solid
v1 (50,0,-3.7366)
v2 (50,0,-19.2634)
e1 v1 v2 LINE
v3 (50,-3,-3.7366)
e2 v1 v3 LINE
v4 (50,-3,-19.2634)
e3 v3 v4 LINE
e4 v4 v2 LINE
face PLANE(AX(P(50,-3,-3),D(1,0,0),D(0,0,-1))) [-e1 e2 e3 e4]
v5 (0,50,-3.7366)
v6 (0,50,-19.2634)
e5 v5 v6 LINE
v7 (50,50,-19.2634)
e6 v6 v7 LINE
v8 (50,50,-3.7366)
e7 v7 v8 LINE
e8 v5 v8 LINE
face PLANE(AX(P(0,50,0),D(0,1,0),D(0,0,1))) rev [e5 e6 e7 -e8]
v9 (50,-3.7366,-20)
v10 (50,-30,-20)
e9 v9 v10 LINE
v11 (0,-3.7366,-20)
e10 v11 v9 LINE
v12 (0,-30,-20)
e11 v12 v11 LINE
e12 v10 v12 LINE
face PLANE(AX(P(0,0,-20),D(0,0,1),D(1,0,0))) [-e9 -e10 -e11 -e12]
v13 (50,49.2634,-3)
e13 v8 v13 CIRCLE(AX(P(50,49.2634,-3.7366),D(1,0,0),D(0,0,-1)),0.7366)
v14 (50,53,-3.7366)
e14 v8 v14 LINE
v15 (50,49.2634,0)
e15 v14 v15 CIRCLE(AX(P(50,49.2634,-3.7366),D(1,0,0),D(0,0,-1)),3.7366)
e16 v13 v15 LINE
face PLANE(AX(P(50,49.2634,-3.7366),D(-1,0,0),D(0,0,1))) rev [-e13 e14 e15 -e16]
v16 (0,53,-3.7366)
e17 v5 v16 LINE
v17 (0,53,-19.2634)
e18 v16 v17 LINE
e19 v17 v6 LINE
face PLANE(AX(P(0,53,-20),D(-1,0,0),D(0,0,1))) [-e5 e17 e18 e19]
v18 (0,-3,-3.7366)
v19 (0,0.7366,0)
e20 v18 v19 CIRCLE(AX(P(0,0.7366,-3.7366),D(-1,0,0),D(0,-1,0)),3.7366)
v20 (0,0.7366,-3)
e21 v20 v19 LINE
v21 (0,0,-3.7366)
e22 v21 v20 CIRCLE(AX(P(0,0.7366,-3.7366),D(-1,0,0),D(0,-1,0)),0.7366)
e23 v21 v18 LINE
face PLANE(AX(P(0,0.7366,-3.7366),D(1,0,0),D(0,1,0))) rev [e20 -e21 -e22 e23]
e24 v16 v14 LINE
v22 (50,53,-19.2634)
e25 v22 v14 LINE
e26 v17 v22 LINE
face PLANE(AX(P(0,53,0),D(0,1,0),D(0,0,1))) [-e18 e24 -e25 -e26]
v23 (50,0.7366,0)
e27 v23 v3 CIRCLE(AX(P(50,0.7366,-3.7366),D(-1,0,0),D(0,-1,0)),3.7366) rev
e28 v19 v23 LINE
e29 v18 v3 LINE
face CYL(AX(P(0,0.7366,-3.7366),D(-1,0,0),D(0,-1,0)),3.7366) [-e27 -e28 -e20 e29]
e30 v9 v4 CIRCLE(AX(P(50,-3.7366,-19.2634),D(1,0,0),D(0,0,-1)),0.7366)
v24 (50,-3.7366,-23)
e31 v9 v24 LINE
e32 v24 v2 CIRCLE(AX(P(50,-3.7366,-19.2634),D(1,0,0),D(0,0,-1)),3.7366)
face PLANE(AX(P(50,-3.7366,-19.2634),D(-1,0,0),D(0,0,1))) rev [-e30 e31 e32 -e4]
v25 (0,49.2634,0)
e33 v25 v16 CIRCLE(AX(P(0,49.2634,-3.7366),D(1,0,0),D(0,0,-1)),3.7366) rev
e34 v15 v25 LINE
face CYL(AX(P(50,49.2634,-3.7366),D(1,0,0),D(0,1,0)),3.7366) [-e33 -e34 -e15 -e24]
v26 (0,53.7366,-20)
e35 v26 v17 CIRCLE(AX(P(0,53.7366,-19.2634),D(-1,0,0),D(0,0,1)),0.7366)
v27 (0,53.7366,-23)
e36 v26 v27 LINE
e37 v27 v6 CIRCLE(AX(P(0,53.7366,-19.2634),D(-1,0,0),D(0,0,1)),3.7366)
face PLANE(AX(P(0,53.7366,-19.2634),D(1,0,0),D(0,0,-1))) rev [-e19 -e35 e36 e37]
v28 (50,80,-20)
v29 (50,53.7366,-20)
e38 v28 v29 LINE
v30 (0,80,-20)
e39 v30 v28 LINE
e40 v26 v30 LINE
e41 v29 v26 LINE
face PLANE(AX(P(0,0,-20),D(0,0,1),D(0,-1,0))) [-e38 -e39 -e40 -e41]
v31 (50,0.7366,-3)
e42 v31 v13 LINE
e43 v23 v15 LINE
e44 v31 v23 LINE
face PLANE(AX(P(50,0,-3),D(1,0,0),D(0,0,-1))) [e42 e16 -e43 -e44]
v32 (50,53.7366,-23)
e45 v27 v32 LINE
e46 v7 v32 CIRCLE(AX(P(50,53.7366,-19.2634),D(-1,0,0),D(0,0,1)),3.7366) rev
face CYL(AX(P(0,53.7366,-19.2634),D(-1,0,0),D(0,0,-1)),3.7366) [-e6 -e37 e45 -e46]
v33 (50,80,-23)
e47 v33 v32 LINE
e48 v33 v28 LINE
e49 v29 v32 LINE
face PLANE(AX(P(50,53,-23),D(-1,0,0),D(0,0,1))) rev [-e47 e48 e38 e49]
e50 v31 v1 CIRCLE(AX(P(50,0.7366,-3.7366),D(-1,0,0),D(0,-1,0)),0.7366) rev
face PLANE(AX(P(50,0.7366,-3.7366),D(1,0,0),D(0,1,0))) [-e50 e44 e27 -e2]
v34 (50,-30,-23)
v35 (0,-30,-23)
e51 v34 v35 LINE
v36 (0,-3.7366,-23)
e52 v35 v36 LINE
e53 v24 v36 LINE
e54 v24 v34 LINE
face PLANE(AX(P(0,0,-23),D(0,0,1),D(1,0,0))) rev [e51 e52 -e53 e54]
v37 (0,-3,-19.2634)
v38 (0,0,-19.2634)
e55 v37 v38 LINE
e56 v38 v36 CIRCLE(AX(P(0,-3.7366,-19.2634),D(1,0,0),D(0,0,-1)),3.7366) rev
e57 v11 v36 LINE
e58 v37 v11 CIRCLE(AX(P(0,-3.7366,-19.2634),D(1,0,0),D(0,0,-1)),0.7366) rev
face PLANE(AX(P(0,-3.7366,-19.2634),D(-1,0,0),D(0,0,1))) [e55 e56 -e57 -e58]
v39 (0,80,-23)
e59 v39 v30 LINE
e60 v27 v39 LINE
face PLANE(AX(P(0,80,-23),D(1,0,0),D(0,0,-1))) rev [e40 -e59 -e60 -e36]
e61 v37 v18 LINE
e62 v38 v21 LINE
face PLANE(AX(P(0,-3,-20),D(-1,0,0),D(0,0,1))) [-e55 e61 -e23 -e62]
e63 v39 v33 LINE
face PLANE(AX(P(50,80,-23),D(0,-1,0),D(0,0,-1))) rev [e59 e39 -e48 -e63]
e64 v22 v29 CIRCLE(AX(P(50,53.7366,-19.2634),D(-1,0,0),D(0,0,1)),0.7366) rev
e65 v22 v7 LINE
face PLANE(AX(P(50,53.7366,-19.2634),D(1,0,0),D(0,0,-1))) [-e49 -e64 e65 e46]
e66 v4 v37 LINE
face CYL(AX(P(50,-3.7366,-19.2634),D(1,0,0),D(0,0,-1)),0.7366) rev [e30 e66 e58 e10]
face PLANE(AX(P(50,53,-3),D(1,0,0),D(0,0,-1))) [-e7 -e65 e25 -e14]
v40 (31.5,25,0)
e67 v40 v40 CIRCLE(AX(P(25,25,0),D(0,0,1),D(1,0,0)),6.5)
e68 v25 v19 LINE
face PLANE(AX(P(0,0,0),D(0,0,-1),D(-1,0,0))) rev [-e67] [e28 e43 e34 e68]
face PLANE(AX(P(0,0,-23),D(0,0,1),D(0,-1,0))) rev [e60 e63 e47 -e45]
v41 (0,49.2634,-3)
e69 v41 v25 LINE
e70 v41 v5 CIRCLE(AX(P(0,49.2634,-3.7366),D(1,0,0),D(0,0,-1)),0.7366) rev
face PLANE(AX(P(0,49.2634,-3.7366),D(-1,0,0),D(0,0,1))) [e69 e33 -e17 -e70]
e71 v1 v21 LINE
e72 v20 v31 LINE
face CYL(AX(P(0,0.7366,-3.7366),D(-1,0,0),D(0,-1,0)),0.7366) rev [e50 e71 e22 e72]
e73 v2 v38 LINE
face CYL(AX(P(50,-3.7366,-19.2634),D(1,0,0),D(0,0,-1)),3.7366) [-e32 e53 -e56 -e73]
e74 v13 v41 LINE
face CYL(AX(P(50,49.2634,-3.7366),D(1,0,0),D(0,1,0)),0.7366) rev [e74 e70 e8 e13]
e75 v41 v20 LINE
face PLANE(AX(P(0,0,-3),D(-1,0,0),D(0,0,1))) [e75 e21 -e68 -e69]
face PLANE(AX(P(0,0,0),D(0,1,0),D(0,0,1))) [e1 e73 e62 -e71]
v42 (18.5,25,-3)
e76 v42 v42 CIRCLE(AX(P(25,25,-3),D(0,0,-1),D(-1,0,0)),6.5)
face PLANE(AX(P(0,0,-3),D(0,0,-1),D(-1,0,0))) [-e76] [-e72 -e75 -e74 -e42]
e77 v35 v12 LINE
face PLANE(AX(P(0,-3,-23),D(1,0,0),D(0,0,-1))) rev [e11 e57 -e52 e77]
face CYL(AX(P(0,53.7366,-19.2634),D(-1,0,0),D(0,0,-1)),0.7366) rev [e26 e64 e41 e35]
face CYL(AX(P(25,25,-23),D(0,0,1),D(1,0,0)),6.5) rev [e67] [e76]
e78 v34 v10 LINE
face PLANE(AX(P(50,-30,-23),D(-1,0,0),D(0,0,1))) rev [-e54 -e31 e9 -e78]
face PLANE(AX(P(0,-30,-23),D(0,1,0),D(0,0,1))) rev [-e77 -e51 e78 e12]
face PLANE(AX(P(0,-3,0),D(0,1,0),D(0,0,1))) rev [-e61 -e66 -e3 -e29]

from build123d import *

# Parameters (mm, degrees)
SKETCH_1_W                         = 50
SKETCH_1_H                         = 50
SM_BASE_FLANGE_1_DEPTH             = 3
SM_EDGE_FLANGE_1_STRIP_W           = 13.4732
SM_EDGE_FLANGE_1_STRIP_H           = 3
SM_EDGE_FLANGE_1_STRIP_CUT_DEPTH   = 50
SM_EDGE_FLANGE_1_STRIP_2_W         = 13.4732
SM_EDGE_FLANGE_1_STRIP_2_H         = 3
SM_EDGE_FLANGE_1_STRIP_CUT_2_DEPTH = 50
SM_EDGE_FLANGE_1_DEPTH             = 50
SM_EDGE_FLANGE_1_BEND_DEPTH        = 50
SM_EDGE_FLANGE_2_STRIP_W           = 13.4732
SM_EDGE_FLANGE_2_STRIP_H           = 3
SM_EDGE_FLANGE_2_STRIP_CUT_DEPTH   = 50
SM_EDGE_FLANGE_2_STRIP_2_W         = 13.4732
SM_EDGE_FLANGE_2_STRIP_2_H         = 3
SM_EDGE_FLANGE_2_STRIP_CUT_2_DEPTH = 50
SM_EDGE_FLANGE_2_DEPTH             = 50
SM_EDGE_FLANGE_2_BEND_DEPTH        = 50
SKETCH_18_R                        = 6.5
CUT_EXTRUDE_1_DEPTH                = 98.103038058


# Sheet-metal steps are written as plain solids
with BuildPart() as part:
    # Sketch 1 → 基体-法兰1 (new body)
    with BuildSketch(Plane.XY):
        with Locations((25, 25)):
            Rectangle(SKETCH_1_W, SKETCH_1_H)
    extrude(amount=-SM_BASE_FLANGE_1_DEPTH)

    # 边线-法兰1 strip (across the edge) → 边线-法兰1 strip cut (cut)
    with BuildSketch(Plane(origin=(0, 50, -3), x_dir=(0, -1, 0), z_dir=(1, 0, 0))):
        with Locations((-6, -1.5)):
            Rectangle(SM_EDGE_FLANGE_1_STRIP_W, SM_EDGE_FLANGE_1_STRIP_H)
    extrude(amount=SM_EDGE_FLANGE_1_STRIP_CUT_DEPTH, mode=Mode.SUBTRACT)

    # 边线-法兰1 strip 2 (across the edge) → 边线-法兰1 strip cut 2 (cut)
    with BuildSketch(Plane(origin=(50, 0, -3), x_dir=(0, 1, 0), z_dir=(-1, 0, 0))):
        with Locations((-6, -1.5)):
            Rectangle(SM_EDGE_FLANGE_1_STRIP_2_W, SM_EDGE_FLANGE_1_STRIP_2_H)
    extrude(amount=SM_EDGE_FLANGE_1_STRIP_CUT_2_DEPTH, mode=Mode.SUBTRACT)

    # 边线-法兰1 section (across the edge) → 边线-法兰1 (add)
    with BuildSketch(Plane(origin=(0, 50, -3), x_dir=(0, -1, 0), z_dir=(1, 0, 0))):
        with BuildLine():
            Line((-3, 0.7366), (-3, 17))
            Line((-3, 17), (0, 17))
            Line((0, 17), (0, 0.7366))
            ThreePointArc((0, 0.7366), (0.215745145, 0.215745145), (0.7366, 0))
            Line((0.7366, 0), (0.7366, -3))
            ThreePointArc((0.7366, -3), (-1.905575199, -1.905575199), (-3, 0.7366))
        make_face()
    extrude(amount=SM_EDGE_FLANGE_1_DEPTH)

    # 边线-法兰1 section 2 (across the edge) → 边线-法兰1 bend (add)
    with BuildSketch(Plane(origin=(50, 0, -3), x_dir=(0, 1, 0), z_dir=(-1, 0, 0))):
        with BuildLine():
            Line((-3, 0.7366), (-3, 17))
            Line((-3, 17), (0, 17))
            Line((0, 17), (0, 0.7366))
            ThreePointArc((0, 0.7366), (0.215745145, 0.215745145), (0.7366, 0))
            Line((0.7366, 0), (0.7366, -3))
            ThreePointArc((0.7366, -3), (-1.905575199, -1.905575199), (-3, 0.7366))
        make_face()
    extrude(amount=SM_EDGE_FLANGE_1_BEND_DEPTH)

    # 边线-法兰2 strip (across the edge) → 边线-法兰2 strip cut (cut)
    with BuildSketch(Plane(origin=(0, -3, -20), x_dir=(0, 0, 1), z_dir=(1, 0, 0))):
        with Locations((-6, -1.5)):
            Rectangle(SM_EDGE_FLANGE_2_STRIP_W, SM_EDGE_FLANGE_2_STRIP_H)
    extrude(amount=SM_EDGE_FLANGE_2_STRIP_CUT_DEPTH, mode=Mode.SUBTRACT)

    # 边线-法兰2 strip 2 (across the edge) → 边线-法兰2 strip cut 2 (cut)
    with BuildSketch(Plane(origin=(50, 53, -20), x_dir=(0, 0, 1), z_dir=(-1, 0, 0))):
        with Locations((-6, -1.5)):
            Rectangle(SM_EDGE_FLANGE_2_STRIP_2_W, SM_EDGE_FLANGE_2_STRIP_2_H)
    extrude(amount=SM_EDGE_FLANGE_2_STRIP_CUT_2_DEPTH, mode=Mode.SUBTRACT)

    # 边线-法兰2 section (across the edge) → 边线-法兰2 (add)
    with BuildSketch(Plane(origin=(0, -3, -20), x_dir=(0, 0, 1), z_dir=(1, 0, 0))):
        with BuildLine():
            Line((-3, 0.7366), (-3, 27))
            Line((-3, 27), (0, 27))
            Line((0, 27), (0, 0.7366))
            ThreePointArc((0, 0.7366), (0.215745145, 0.215745145), (0.7366, 0))
            Line((0.7366, 0), (0.7366, -3))
            ThreePointArc((0.7366, -3), (-1.905575199, -1.905575199), (-3, 0.7366))
        make_face()
    extrude(amount=SM_EDGE_FLANGE_2_DEPTH)

    # 边线-法兰2 section 2 (across the edge) → 边线-法兰2 bend (add)
    with BuildSketch(Plane(origin=(50, 53, -20), x_dir=(0, 0, 1), z_dir=(-1, 0, 0))):
        with BuildLine():
            Line((-3, 0.7366), (-3, 27))
            Line((-3, 27), (0, 27))
            Line((0, 27), (0, 0.7366))
            ThreePointArc((0, 0.7366), (0.215745145, 0.215745145), (0.7366, 0))
            Line((0.7366, 0), (0.7366, -3))
            ThreePointArc((0.7366, -3), (-1.905575199, -1.905575199), (-3, 0.7366))
        make_face()
    extrude(amount=SM_EDGE_FLANGE_2_BEND_DEPTH)

    # 草图18 → 切除-拉伸1 (cut, through all)
    with BuildSketch(Plane.XY):
        with Locations((25, 25)):
            Circle(SKETCH_18_R)
    extrude(amount=-CUT_EXTRUDE_1_DEPTH, mode=Mode.SUBTRACT)


solid = part.part
